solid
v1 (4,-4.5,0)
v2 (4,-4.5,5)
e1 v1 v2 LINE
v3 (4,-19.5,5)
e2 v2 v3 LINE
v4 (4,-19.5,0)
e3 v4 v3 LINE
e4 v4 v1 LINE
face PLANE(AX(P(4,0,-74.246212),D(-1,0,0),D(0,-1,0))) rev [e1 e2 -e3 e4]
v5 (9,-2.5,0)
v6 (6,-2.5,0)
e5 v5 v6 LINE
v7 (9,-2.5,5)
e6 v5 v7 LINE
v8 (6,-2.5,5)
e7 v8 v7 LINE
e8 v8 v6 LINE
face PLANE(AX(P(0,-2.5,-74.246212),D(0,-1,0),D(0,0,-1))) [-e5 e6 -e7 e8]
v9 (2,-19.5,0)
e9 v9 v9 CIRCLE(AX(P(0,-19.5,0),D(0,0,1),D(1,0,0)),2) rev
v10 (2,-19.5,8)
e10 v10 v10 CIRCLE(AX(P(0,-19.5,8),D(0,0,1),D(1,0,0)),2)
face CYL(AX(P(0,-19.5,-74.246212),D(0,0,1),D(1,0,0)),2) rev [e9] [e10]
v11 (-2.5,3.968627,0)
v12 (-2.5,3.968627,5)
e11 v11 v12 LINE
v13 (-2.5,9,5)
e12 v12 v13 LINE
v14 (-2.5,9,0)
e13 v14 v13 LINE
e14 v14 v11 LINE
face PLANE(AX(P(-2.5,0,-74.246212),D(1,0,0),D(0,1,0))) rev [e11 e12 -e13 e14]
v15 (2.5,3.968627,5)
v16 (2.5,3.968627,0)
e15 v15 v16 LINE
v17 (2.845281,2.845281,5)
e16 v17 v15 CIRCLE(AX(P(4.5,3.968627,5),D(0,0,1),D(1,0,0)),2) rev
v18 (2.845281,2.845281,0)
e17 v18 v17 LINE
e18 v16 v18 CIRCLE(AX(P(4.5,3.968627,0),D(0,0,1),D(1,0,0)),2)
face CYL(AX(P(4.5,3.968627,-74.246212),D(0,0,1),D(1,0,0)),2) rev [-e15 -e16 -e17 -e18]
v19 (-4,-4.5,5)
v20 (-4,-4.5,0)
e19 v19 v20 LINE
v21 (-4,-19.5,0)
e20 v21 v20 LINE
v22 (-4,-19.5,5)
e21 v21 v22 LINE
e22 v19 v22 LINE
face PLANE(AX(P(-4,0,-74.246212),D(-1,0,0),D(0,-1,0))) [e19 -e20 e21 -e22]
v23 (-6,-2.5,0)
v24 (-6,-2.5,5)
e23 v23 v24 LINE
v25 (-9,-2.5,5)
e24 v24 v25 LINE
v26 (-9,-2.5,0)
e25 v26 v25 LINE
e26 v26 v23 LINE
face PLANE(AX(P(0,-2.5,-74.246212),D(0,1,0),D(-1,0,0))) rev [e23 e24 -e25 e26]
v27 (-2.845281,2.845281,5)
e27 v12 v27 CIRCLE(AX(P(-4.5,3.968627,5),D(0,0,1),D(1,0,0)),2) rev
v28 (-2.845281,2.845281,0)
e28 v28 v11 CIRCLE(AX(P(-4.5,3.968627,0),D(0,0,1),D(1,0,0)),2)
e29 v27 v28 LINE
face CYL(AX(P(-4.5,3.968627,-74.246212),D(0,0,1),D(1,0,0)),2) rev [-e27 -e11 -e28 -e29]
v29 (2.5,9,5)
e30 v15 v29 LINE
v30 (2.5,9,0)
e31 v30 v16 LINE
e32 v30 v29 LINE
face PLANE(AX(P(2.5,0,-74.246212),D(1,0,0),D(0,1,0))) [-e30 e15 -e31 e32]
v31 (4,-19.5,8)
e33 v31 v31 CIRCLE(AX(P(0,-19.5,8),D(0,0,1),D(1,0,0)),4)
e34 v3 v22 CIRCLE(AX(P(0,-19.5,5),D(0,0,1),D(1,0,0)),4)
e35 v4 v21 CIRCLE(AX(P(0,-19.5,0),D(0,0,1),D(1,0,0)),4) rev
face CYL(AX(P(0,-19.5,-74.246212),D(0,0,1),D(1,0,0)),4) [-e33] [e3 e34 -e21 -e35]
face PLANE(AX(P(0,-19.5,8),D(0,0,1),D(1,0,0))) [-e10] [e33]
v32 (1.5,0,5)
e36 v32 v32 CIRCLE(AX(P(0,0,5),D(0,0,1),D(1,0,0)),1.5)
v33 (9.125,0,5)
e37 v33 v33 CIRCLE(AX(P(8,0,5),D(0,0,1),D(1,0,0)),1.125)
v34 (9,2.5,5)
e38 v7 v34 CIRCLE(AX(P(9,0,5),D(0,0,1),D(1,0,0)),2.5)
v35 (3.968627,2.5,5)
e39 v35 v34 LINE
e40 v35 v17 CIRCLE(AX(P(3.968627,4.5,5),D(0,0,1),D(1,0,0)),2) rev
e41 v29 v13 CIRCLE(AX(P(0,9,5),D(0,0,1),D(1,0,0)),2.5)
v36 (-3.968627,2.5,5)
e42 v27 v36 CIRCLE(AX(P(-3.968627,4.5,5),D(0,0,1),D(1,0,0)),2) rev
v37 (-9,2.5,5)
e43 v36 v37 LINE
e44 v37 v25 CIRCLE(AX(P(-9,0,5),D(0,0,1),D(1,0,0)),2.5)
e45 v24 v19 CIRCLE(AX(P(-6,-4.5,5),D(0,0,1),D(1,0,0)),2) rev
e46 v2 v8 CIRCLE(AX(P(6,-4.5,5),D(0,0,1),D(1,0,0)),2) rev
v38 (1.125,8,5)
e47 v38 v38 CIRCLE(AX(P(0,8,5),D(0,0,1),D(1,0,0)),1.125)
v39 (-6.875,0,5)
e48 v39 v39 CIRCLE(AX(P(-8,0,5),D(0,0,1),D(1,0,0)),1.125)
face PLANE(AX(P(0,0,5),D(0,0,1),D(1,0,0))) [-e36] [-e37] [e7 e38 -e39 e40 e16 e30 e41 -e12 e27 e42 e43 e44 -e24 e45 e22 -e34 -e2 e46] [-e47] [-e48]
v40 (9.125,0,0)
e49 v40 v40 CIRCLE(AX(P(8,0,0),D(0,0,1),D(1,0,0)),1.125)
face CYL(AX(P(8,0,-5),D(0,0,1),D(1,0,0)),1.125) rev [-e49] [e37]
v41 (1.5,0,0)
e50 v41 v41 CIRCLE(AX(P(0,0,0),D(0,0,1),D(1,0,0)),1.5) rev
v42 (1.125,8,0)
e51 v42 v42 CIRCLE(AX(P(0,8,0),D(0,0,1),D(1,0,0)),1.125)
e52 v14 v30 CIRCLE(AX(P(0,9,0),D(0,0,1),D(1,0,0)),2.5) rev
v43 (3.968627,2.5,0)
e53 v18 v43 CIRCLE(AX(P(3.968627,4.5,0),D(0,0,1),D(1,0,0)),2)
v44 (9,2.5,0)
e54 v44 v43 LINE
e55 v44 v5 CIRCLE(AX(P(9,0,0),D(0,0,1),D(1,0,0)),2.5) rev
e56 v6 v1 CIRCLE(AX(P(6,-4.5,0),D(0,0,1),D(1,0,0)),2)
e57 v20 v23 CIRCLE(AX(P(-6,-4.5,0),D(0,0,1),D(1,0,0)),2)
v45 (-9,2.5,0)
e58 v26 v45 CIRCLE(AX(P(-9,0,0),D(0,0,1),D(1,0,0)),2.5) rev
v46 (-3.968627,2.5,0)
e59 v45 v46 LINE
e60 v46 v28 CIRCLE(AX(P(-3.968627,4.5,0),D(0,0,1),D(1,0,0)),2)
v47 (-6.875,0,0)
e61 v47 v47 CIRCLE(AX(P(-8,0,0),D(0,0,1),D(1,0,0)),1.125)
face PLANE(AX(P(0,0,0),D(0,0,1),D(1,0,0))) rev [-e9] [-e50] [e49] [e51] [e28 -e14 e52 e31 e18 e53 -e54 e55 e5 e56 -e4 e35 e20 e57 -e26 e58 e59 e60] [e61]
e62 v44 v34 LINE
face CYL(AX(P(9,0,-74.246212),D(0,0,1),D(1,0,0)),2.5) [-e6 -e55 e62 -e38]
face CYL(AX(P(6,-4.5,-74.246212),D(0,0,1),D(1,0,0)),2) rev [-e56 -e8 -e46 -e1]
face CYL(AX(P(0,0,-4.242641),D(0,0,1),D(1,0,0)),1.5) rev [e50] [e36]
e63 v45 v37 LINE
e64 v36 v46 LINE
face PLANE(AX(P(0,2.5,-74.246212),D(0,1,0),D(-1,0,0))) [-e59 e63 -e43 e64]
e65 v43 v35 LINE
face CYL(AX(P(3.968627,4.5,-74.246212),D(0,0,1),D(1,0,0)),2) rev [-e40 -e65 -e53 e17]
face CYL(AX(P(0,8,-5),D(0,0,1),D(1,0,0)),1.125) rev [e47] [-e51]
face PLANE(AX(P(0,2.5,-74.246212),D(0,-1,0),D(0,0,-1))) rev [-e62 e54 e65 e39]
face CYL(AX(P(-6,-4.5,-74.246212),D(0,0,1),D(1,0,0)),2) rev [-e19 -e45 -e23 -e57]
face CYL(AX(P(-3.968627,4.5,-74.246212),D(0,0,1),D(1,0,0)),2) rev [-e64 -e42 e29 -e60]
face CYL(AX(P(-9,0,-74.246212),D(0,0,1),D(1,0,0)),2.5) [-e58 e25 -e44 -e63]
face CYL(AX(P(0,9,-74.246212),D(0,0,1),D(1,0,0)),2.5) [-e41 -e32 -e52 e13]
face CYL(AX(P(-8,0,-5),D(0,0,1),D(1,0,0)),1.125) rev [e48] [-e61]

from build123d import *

# Parameters (mm, degrees)
ESQUISSE1_R             = 26.25
BOSS_EXTRU_1_DEPTH      = 5
ESQUISSE2_R             = 1.5
ENL_V_MAT_EXTRU_1_DEPTH = 5
ENL_V_START             = -5
ESQUISSE3_R             = 26.25
ESQUISSE3_R_2           = 2
ENL_V_MAT_EXTRU_2_DEPTH = 5
CONG_1_R                = 2
ESQUISSE4_R             = 1.125
ENL_V_MAT_EXTRU_3_DEPTH = 10
ESQUISSE5_R             = 4
ESQUISSE5_R_2           = 2
BOSS_EXTRU_2_DEPTH      = 3


with BuildPart() as part:
    # Esquisse1 → Boss.-Extru.1 (new body)
    with BuildSketch(Plane.XY):
        Circle(ESQUISSE1_R)
    extrude(amount=BOSS_EXTRU_1_DEPTH)

    # Esquisse2 → Enlèv. mat.-Extru.1 (cut)
    with BuildSketch(Plane.XY.offset(5)):
        Circle(ESQUISSE2_R)
    extrude(amount=-ENL_V_MAT_EXTRU_1_DEPTH, mode=Mode.SUBTRACT)

    # Esquisse3 → Enlèv. mat.-Extru.2 (cut)
    # profile 1 of 2: a face of its own
    with BuildSketch(Plane.XY.offset(5).offset(ENL_V_START)):
        Circle(ESQUISSE3_R)
        with BuildLine():
            Line((9, -2.5), (4, -2.5))
            Line((4, -2.5), (4, -19.5))
            ThreePointArc((4, -19.5), (0, -23.5), (-4, -19.5))
            Line((-4, -19.5), (-4, -2.5))
            Line((-4, -2.5), (-9, -2.5))
            ThreePointArc((-9, -2.5), (-11.5, 0), (-9, 2.5))
            Line((-9, 2.5), (-3.122498999, 2.5))
            ThreePointArc((-3.122498999, 2.5), (-2.828427125, 2.828427125), (-2.5, 3.122498999))
            Line((-2.5, 3.122498999), (-2.5, 9))
            ThreePointArc((-2.5, 9), (0, 11.5), (2.5, 9))
            Line((2.5, 9), (2.5, 3.122498999))
            ThreePointArc((2.5, 3.122498999), (2.828427125, 2.828427125), (3.122498999, 2.5))
            Line((3.122498999, 2.5), (9, 2.5))
            ThreePointArc((9, 2.5), (11.5, 0), (9, -2.5))
        make_face(mode=Mode.SUBTRACT)
    # profile 2 of 2: a face of its own
    with BuildSketch(Plane.XY.offset(5).offset(ENL_V_START)):
        with Locations((0, -19.5)):
            Circle(ESQUISSE3_R_2)
    extrude(amount=ENL_V_MAT_EXTRU_2_DEPTH, mode=Mode.SUBTRACT)

    # Congé1
    # the kernel refuses this fillet: 2 mm, written as the material it adds along each edge
    with BuildSketch(Plane(origin=(-4, -2.5, 0), x_dir=(0, -1, 0), z_dir=(0, 0, 1)), Plane(origin=(4, -2.5, 0), x_dir=(1, 0, 0), z_dir=(0, 0, 1))) as cong_1_piece_1:
        with BuildLine():
            CenterArc((CONG_1_R, -CONG_1_R), CONG_1_R, 90, 90)
            Line((0, -CONG_1_R), (0, 0))
            Line((0, 0), (CONG_1_R, 0))
        make_face()
    extrude(amount=5)
    with BuildSketch(Plane(origin=(-3.122498999, 2.5, 0), x_dir=(-1, 0, 0), z_dir=(0, 0, 1))) as cong_1_piece_2:
        with BuildLine():
            CenterArc((0.846127967, -2), CONG_1_R, 90, 41.409622109)
            ThreePointArc((-0.476747688, -0.5), (-0.227558946, -0.260311955), (0, 0))
            Line((0, 0), (0.846127967, 0))
        make_face()
    extrude(amount=5)
    with BuildSketch(Plane(origin=(-2.5, 3.122498999, 0), x_dir=(-0.7237350132500174, -0.6900779887780779, 0), z_dir=(0, 0, 1)), Plane(origin=(3.122498999, 2.5, 0), x_dir=(-0.6900779887780603, 0.7237350132500343, 0), z_dir=(0, 0, 1))) as cong_1_piece_3:
        with BuildLine():
            CenterArc((0.863575741, -1.992528413), CONG_1_R, 94.954095219, 41.409622109)
            Line((-0.583894286, -0.612372436), (0, 0))
            ThreePointArc((0, 0), (0.345430296, -0.014943173), (0.690860592, 0))
        make_face()
    extrude(amount=5)
    with BuildSketch(Plane(origin=(2.5, 3.122498999, 0), x_dir=(0.7237350132500171, -0.6900779887780782, 0), z_dir=(0, 0, 1))) as cong_1_piece_4:
        with BuildLine():
            CenterArc((0.863575741, 1.992528413), CONG_1_R, 223.636282672, 41.409622109)
            Line((-0.583894286, 0.612372436), (0, 0))
            ThreePointArc((0, 0), (0.345430296, 0.014943173), (0.690860592, 0))
        make_face()
    extrude(amount=5)

    # Esquisse4 → Enlèv. mat.-Extru.3 (cut)
    with BuildSketch(Plane.XY.offset(5)):
        with Locations((8, 0)):
            Circle(ESQUISSE4_R)
        with Locations((-8, 0)):
            Circle(ESQUISSE4_R)
        with Locations((0, 8)):
            Circle(ESQUISSE4_R)
    extrude(amount=-ENL_V_MAT_EXTRU_3_DEPTH, mode=Mode.SUBTRACT)

    # Esquisse5 → Boss.-Extru.2 (add)
    with BuildSketch(Plane.XY.offset(5)):
        with Locations((0, -19.5)):
            Circle(ESQUISSE5_R)
        with Locations((0, -19.5)):
            Circle(ESQUISSE5_R_2, mode=Mode.SUBTRACT)
    extrude(amount=BOSS_EXTRU_2_DEPTH)


solid = part.part
